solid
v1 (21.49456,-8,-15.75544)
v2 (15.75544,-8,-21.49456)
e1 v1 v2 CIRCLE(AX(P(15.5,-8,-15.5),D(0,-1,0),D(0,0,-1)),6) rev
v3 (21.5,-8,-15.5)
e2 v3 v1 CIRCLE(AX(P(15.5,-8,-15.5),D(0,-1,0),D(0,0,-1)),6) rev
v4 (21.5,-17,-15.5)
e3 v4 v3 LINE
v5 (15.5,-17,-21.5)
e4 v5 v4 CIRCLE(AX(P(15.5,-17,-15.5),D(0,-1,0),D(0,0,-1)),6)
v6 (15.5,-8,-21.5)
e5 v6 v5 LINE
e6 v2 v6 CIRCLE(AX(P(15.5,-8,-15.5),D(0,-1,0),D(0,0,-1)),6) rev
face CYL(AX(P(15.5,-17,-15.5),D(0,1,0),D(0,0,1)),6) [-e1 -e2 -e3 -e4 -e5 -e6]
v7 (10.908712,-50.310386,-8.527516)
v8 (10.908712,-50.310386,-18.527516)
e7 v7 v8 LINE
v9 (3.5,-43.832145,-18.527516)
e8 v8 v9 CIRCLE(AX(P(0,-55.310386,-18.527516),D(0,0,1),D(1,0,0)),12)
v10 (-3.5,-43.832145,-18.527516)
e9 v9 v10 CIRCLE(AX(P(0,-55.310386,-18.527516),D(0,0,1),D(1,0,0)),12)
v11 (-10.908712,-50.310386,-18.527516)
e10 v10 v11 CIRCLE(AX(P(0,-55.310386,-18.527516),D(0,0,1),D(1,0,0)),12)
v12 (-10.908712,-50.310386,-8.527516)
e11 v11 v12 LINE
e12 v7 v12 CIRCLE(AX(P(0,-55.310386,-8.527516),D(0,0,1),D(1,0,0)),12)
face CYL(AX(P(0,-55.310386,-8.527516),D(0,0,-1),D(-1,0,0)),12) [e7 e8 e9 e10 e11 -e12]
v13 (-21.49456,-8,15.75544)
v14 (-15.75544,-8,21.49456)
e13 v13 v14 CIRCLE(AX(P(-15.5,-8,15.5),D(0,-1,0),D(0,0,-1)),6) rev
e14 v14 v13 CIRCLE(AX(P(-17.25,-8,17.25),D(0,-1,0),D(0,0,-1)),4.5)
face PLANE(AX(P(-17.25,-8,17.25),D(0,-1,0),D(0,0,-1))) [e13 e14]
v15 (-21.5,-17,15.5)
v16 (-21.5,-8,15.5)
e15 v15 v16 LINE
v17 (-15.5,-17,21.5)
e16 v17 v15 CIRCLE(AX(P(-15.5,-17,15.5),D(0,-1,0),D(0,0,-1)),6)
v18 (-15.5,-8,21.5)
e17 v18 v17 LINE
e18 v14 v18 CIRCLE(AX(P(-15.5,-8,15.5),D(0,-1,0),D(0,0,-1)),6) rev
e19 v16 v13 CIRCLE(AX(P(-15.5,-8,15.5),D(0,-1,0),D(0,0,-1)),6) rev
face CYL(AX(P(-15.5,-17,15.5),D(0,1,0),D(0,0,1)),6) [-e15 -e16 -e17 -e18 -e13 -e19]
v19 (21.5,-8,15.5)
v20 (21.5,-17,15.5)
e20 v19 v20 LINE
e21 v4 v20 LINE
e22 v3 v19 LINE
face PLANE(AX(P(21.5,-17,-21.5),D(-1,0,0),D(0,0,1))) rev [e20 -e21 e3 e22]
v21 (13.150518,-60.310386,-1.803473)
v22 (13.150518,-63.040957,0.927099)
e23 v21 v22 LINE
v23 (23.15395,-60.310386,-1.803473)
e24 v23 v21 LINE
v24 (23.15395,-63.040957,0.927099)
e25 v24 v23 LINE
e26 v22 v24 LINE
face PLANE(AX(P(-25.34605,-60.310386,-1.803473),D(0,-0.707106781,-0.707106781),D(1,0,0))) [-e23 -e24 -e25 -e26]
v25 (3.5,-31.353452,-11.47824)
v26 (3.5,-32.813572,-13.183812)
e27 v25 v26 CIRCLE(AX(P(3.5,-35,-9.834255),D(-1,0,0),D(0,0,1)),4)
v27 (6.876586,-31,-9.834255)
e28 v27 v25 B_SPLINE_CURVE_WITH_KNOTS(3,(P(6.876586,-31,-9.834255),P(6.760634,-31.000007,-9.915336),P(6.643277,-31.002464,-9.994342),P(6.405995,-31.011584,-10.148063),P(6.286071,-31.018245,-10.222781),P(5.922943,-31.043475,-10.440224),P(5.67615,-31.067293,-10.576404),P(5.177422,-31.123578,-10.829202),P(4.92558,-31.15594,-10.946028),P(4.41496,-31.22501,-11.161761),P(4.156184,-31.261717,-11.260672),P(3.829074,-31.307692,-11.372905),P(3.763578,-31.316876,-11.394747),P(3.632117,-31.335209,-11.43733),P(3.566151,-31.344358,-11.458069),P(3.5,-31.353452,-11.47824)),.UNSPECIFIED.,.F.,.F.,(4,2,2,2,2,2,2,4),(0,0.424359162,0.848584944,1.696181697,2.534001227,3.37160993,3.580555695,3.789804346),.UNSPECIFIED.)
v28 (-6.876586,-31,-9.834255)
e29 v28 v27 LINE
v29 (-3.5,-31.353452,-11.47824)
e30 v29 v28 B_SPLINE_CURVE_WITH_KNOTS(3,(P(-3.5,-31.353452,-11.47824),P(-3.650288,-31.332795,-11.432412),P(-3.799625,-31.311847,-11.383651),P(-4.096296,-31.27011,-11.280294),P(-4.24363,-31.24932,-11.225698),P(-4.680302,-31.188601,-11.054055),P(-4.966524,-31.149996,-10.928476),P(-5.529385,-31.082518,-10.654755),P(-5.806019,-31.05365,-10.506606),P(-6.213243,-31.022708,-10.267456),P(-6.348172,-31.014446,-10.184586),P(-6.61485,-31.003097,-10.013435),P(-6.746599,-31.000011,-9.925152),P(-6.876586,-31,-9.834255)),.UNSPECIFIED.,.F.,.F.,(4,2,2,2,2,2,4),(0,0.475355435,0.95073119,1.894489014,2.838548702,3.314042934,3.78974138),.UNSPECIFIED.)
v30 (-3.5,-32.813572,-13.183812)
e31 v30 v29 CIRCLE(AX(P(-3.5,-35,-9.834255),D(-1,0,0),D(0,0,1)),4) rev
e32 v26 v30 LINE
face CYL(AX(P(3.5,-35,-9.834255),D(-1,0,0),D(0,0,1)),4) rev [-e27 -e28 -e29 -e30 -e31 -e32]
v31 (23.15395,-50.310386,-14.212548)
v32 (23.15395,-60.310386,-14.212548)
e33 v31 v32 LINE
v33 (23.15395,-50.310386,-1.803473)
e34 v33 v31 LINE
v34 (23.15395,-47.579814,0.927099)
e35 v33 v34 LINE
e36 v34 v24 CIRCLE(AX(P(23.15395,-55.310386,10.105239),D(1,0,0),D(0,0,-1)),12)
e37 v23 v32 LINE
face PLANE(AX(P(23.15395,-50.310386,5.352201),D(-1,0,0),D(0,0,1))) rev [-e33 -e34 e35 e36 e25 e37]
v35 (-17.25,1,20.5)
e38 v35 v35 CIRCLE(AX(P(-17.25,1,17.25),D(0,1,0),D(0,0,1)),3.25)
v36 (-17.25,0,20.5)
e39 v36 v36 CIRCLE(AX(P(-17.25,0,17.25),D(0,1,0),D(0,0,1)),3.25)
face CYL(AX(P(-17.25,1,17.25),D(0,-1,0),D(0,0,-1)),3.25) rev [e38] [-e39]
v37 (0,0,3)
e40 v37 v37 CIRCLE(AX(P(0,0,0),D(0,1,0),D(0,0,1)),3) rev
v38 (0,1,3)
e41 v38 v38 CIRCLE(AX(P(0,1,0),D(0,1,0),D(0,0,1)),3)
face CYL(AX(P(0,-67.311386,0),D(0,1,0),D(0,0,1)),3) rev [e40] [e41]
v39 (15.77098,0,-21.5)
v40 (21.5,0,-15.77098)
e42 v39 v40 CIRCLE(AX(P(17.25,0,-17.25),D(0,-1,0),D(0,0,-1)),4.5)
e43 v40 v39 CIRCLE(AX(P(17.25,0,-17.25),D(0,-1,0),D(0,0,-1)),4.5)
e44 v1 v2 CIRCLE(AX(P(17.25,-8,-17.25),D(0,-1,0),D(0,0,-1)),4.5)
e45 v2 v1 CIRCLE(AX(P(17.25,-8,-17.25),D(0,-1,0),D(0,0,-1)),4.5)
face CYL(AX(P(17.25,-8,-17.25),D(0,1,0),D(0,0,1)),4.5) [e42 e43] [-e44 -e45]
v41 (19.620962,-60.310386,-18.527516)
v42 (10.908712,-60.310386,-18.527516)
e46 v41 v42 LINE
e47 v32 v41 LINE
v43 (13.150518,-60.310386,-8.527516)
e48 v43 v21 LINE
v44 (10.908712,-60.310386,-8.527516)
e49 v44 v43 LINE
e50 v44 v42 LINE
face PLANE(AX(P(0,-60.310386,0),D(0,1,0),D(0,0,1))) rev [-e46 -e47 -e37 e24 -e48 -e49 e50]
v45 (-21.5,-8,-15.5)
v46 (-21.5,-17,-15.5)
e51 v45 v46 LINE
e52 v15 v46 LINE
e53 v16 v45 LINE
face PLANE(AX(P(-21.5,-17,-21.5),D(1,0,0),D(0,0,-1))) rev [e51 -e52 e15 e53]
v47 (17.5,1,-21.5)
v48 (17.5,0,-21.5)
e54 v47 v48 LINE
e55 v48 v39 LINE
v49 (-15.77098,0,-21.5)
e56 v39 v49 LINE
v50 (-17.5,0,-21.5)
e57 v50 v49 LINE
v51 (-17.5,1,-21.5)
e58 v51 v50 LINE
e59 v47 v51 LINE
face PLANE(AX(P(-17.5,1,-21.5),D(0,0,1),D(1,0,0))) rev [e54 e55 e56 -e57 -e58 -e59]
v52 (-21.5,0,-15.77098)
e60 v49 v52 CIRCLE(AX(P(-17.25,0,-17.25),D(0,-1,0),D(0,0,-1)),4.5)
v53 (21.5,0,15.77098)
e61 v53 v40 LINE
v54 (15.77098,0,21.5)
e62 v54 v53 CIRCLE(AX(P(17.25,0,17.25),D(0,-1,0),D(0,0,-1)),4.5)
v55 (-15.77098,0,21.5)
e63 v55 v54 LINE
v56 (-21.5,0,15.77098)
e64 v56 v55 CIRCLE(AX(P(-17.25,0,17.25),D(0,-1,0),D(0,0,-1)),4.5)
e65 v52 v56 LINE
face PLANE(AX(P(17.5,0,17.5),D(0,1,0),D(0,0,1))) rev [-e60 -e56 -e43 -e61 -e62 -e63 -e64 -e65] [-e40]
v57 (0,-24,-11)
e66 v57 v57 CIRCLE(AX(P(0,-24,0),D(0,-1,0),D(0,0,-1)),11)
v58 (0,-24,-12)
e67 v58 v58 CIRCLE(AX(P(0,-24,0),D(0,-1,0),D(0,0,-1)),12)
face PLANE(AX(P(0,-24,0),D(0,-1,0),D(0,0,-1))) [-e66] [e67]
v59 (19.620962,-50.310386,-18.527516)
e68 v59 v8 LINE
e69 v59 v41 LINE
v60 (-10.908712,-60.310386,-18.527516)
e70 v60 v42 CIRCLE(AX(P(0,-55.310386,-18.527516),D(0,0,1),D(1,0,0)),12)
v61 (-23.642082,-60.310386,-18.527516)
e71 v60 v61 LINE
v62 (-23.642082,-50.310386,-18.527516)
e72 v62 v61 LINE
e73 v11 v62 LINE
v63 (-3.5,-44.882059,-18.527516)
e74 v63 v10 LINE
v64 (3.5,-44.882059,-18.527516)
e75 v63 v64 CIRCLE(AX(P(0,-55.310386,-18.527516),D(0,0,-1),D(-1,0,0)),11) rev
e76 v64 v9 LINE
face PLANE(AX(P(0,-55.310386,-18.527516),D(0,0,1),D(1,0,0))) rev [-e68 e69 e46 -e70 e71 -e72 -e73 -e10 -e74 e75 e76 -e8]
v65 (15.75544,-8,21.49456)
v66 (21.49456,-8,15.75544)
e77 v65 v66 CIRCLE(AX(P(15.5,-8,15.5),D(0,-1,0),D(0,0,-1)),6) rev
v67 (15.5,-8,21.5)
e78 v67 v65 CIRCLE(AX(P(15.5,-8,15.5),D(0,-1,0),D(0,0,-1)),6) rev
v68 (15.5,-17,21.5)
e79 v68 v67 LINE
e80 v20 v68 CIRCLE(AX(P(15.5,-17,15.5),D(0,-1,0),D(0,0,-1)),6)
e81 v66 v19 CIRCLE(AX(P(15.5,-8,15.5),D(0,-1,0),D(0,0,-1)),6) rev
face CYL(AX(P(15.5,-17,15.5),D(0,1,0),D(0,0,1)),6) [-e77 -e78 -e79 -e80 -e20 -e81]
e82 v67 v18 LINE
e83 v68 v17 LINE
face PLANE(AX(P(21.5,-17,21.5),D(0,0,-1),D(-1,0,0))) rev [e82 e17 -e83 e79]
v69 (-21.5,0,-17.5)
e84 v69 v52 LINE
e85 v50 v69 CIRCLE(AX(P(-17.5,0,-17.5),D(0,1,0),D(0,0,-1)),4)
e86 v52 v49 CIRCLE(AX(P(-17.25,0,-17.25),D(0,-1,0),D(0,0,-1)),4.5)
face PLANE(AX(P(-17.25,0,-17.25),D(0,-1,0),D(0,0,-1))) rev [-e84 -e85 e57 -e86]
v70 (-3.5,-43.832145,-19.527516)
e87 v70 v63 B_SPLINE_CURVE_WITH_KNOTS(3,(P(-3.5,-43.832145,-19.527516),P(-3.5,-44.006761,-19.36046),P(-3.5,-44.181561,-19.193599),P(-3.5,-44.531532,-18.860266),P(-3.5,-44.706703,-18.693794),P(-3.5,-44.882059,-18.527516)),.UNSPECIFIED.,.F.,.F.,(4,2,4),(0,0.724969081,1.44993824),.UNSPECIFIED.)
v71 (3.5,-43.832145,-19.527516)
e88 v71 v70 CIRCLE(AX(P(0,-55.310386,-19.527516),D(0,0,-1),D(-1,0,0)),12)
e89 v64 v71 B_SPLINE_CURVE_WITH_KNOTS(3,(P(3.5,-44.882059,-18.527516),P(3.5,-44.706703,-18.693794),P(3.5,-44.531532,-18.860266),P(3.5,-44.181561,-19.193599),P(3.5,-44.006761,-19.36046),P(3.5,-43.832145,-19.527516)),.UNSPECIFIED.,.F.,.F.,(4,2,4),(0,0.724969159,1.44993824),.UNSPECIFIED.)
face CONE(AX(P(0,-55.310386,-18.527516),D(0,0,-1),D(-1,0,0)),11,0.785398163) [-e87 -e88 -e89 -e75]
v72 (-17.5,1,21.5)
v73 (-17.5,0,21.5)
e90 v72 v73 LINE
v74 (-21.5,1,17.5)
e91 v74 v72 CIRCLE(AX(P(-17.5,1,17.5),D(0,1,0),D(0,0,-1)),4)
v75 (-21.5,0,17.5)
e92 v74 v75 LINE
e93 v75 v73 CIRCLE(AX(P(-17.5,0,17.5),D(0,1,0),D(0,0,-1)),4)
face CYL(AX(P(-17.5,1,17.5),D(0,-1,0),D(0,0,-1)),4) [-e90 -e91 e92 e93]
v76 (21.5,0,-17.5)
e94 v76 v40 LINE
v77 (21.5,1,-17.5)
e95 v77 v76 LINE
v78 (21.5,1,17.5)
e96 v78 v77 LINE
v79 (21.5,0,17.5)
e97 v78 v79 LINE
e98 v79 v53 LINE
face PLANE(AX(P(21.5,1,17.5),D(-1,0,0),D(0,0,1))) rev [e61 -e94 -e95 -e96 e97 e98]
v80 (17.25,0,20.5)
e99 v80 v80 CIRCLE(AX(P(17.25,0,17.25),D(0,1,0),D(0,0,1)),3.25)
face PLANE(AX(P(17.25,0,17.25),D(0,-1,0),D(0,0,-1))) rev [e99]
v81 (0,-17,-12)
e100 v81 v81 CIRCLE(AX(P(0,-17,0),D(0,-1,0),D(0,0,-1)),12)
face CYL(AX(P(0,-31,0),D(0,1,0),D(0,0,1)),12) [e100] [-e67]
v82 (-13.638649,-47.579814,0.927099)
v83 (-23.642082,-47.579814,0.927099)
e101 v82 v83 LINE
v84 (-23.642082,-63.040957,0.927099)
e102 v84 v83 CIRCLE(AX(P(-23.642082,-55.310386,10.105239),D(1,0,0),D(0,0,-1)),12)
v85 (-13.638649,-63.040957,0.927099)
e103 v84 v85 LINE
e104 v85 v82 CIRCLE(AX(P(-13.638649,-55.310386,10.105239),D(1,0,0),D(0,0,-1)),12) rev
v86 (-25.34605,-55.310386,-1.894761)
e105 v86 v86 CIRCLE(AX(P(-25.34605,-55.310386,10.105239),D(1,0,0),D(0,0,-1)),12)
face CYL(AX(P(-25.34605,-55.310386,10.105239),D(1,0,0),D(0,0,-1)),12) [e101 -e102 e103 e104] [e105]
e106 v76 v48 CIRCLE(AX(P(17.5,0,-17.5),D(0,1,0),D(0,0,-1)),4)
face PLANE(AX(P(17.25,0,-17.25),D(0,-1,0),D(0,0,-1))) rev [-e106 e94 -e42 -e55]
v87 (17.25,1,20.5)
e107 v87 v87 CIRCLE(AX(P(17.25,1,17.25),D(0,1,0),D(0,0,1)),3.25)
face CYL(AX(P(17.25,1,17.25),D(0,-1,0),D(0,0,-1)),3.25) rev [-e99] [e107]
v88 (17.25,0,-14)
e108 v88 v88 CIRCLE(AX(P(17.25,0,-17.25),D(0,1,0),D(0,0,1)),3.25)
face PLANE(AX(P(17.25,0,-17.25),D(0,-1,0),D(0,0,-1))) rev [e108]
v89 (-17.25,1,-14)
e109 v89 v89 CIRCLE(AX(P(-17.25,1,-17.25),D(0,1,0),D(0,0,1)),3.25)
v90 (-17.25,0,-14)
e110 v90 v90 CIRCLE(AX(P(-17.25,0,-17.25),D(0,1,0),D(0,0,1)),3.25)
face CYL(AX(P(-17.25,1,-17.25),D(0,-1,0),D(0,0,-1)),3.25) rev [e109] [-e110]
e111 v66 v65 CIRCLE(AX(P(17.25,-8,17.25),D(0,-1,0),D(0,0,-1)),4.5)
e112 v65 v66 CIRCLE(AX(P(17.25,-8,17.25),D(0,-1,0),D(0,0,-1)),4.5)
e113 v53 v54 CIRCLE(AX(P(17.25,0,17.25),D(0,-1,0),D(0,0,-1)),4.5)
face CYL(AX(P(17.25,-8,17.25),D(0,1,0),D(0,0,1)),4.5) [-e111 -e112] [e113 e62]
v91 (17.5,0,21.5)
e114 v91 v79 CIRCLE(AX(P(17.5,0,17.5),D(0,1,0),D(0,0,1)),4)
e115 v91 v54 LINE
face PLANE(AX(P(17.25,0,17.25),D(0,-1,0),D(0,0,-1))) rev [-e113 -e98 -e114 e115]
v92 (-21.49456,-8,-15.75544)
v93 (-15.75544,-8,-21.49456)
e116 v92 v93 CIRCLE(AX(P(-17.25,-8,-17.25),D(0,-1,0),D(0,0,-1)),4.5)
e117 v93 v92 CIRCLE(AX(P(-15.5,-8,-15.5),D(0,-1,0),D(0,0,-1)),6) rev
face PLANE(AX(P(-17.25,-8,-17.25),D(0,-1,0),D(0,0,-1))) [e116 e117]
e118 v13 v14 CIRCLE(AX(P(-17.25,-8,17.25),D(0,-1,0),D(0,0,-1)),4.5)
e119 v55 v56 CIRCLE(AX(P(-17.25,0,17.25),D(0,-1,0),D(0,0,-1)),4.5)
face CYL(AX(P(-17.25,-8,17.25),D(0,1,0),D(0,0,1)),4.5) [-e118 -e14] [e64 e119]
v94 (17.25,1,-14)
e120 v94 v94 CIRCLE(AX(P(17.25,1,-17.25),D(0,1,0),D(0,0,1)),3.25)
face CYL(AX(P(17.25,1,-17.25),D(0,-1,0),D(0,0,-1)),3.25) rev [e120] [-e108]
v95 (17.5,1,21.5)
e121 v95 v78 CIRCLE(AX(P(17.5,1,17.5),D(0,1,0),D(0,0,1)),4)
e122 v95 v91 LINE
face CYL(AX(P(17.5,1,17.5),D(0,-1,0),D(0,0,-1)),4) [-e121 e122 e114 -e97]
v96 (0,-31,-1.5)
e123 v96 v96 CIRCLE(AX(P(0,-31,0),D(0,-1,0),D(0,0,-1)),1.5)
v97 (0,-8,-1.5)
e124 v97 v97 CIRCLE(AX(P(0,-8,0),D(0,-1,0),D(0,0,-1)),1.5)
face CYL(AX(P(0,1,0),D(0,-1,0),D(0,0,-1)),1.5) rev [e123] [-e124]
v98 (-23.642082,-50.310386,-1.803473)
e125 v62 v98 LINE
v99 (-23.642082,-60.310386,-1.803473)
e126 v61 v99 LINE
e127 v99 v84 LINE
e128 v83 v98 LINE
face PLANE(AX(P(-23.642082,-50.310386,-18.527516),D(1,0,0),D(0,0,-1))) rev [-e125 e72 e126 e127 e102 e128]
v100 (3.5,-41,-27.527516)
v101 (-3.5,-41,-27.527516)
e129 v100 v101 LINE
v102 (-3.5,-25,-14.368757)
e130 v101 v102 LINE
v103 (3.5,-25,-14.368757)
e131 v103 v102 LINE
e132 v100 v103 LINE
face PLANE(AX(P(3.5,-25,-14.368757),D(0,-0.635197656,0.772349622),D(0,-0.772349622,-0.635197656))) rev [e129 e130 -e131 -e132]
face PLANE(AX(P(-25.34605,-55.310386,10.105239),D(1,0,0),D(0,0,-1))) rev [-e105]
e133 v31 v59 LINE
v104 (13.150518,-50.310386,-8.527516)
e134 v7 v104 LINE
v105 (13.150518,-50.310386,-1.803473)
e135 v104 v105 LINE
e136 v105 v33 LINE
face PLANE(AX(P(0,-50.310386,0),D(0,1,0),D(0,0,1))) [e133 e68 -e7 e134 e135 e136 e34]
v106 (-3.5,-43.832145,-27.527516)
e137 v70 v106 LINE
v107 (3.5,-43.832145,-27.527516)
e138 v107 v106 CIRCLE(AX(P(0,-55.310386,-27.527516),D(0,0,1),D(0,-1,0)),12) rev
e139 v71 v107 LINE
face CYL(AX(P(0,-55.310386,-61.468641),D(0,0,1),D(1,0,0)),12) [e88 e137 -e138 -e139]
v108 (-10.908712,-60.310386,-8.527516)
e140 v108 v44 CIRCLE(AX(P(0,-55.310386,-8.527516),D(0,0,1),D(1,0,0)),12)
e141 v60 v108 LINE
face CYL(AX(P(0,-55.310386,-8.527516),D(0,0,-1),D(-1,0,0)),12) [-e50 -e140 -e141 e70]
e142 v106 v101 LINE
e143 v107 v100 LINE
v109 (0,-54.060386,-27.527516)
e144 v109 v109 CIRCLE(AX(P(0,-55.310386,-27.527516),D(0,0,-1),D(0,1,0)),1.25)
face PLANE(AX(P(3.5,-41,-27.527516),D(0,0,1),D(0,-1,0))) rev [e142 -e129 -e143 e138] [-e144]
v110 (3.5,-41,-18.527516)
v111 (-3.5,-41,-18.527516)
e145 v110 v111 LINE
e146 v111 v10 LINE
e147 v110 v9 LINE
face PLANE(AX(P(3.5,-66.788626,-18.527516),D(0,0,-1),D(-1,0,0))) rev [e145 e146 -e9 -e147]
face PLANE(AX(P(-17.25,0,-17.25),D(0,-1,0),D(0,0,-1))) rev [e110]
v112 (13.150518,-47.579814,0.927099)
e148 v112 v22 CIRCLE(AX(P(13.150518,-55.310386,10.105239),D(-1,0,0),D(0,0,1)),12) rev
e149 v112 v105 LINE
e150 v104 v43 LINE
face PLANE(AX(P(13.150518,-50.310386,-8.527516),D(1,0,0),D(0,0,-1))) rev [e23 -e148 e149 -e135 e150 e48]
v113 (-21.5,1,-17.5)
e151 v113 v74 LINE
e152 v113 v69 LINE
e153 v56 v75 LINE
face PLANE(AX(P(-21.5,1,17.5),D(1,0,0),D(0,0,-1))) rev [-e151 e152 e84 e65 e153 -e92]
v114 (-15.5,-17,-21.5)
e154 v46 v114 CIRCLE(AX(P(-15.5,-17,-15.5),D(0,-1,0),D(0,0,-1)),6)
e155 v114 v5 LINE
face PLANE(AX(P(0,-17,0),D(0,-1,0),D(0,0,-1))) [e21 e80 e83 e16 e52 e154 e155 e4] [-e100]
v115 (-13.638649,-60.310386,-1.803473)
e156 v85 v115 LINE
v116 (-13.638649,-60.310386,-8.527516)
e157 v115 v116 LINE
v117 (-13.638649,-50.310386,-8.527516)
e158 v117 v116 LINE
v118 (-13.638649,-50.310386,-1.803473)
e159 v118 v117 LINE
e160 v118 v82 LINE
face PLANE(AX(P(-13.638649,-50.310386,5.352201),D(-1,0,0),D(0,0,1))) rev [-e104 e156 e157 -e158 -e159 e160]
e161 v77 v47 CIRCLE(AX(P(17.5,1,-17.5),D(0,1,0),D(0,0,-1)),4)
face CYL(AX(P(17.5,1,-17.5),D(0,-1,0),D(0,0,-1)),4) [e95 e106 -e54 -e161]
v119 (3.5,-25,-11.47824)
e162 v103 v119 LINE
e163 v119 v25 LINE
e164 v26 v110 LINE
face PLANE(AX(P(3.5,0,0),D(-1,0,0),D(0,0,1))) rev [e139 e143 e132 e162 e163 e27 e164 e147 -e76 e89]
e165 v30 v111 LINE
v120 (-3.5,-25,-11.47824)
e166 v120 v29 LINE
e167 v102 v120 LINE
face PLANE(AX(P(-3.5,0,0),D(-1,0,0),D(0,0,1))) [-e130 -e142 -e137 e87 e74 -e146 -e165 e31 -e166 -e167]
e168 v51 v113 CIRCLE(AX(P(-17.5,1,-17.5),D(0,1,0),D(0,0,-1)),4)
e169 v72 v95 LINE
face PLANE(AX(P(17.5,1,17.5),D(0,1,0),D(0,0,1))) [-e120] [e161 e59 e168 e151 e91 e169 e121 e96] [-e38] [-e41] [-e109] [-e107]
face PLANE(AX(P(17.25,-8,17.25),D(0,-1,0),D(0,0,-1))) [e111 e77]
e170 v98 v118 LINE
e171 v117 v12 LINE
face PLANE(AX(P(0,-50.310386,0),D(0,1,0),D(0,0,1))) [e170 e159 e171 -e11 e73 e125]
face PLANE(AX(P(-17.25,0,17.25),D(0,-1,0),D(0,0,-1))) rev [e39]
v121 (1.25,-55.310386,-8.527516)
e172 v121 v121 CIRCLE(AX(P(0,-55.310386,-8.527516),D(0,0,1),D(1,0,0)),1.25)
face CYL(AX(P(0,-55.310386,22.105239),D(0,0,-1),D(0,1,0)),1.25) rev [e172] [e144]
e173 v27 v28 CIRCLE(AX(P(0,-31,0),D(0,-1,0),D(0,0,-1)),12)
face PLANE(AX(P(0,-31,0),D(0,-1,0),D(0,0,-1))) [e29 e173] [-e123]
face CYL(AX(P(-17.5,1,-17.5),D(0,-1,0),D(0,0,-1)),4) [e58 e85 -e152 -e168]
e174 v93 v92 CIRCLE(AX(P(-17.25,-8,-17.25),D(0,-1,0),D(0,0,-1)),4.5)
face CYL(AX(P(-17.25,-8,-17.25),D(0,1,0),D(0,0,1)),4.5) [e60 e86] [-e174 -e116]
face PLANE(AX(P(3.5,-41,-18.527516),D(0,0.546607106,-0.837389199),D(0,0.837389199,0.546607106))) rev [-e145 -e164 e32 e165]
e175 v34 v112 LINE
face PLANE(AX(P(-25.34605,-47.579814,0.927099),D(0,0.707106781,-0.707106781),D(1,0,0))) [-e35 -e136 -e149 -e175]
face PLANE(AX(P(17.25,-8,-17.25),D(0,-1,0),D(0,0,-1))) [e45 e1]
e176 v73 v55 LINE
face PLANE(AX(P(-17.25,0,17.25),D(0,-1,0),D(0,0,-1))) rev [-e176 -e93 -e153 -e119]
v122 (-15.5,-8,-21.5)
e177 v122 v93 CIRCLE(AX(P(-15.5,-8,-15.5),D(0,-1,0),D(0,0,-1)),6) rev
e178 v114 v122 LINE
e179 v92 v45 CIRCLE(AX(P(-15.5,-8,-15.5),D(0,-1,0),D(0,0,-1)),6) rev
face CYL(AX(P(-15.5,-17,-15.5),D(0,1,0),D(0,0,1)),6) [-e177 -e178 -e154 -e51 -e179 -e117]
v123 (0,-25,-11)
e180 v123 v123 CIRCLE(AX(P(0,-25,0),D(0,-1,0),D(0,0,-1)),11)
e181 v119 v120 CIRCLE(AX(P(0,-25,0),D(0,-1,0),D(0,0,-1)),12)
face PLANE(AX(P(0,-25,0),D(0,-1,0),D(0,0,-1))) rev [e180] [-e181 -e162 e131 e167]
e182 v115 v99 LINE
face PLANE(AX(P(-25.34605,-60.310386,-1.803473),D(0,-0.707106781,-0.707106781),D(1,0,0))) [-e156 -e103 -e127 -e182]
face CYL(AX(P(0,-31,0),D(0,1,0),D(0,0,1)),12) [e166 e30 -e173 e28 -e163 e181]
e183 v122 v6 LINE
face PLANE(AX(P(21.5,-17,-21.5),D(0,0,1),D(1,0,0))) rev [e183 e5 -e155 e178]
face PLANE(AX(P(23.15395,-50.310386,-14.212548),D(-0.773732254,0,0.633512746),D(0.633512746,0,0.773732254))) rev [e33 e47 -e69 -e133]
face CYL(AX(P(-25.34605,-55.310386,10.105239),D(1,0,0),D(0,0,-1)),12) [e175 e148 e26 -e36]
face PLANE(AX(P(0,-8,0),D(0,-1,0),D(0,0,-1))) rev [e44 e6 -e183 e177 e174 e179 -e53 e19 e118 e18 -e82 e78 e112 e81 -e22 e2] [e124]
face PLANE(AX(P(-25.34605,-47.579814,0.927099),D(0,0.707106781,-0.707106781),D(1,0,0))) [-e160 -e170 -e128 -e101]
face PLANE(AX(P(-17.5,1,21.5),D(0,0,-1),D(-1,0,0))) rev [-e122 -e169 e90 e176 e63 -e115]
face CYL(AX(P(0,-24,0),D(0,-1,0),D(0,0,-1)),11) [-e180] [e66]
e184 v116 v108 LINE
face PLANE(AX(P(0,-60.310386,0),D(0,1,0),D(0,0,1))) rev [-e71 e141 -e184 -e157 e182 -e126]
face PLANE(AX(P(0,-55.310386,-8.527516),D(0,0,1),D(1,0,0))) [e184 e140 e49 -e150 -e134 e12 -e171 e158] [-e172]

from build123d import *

# Parameters (mm, degrees)
SKETCH1_R               = 3.25
BOSS_EXTRUDE1_DEPTH     = 1
SKETCH3_R               = 4.5
BOSS_EXTRUDE2_DEPTH     = 8
SKETCH4_W               = 43
SKETCH4_H               = 43
BOSS_EXTRUDE3_DEPTH     = 9
FILLET1_R               = 6
SKETCH5_R               = 12
BOSS_EXTRUDE4_DEPTH     = 14
CUT_EXTRUDE1_START      = 7
SKETCH6_R               = 12
SKETCH6_R_2             = 11
CUT_EXTRUDE1_DEPTH      = 1
BOSS_EXTRUDE5_DEPTH     = 3.5
FILLET2_R               = 4
SKETCH8_R               = 12
BOSS_EXTRUDE6_DEPTH     = 9
CHAMFER1_SIZE           = 1
BOSS_EXTRUDE7_START     = 10
SKETCH10_R              = 12
BOSS_EXTRUDE7_DEPTH     = 10
BOSS_EXTRUDE8_DEPTH     = 5
SKETCH12_R              = 12
BOSS_EXTRUDE9_DEPTH     = 48.5
CUT_EXTRUDE2_DEPTH      = 72.827221304
CUT_EXTRUDE2_DEPTH_BACK = 20
SKETCH13_W              = 26.789167307
SKETCH13_H              = 48.357994596
CHAMFER2_SIZE           = 1
CHAMFER4_SIZE           = 1
CHAMFER5_SIZE           = 1
SKETCH17_R              = 1.25
CUT_EXTRUDE4_DEPTH      = 88.387187875
CUT_EXTRUDE5_REACH      = 79.888
SKETCH18_R              = 3
SKETCH19_R              = 1.5
CUT_EXTRUDE6_DEPTH      = 53.140487552


with BuildPart() as part:
    # Sketch1 → Boss-Extrude1 (new body)
    with BuildSketch(Plane(origin=(0, 0, 0), x_dir=(1, 0, 0), z_dir=(0, 1, 0))):
        with BuildLine():
            Line((-17.5, -21.5), (17.5, -21.5))
            ThreePointArc((17.5, -21.5), (20.328427125, -20.328427125), (21.5, -17.5))
            Line((21.5, -17.5), (21.5, 17.5))
            ThreePointArc((21.5, 17.5), (20.328427125, 20.328427125), (17.5, 21.5))
            Line((17.5, 21.5), (-17.5, 21.5))
            ThreePointArc((-17.5, 21.5), (-20.328427125, 20.328427125), (-21.5, 17.5))
            Line((-21.5, 17.5), (-21.5, -17.5))
            ThreePointArc((-21.5, -17.5), (-20.328427125, -20.328427125), (-17.5, -21.5))
        make_face()
        with Locations(Location((-17.25, 17.25, 0), (0, 0, 270))):
            Circle(SKETCH1_R, mode=Mode.SUBTRACT)
        with Locations(Location((17.25, 17.25, 0), (0, 0, 270))):
            Circle(SKETCH1_R, mode=Mode.SUBTRACT)
        with Locations(Location((17.25, -17.25, 0), (0, 0, 270))):
            Circle(SKETCH1_R, mode=Mode.SUBTRACT)
        with Locations(Location((-17.25, -17.25, 0), (0, 0, 270))):
            Circle(SKETCH1_R, mode=Mode.SUBTRACT)
    extrude(amount=BOSS_EXTRUDE1_DEPTH)

    # Sketch3 → Boss-Extrude2 (add)
    with BuildSketch(Plane.XZ):
        with Locations(Location((-17.25, 17.25, 0), (0, 0, 70.811863546))):
            Circle(SKETCH3_R)
        with Locations(Location((17.25, 17.25, 0), (0, 0, 109.188136454))):
            Circle(SKETCH3_R)
        with Locations(Location((17.25, -17.25, 0), (0, 0, 19.188136454))):
            Circle(SKETCH3_R)
        with Locations(Location((-17.25, -17.25, 0), (0, 0, 160.811863546))):
            Circle(SKETCH3_R)
    extrude(amount=BOSS_EXTRUDE2_DEPTH)

    # Sketch4 → Boss-Extrude3 (add)
    with BuildSketch(Plane.XZ.offset(8)):
        Rectangle(SKETCH4_W, SKETCH4_H)
    extrude(amount=BOSS_EXTRUDE3_DEPTH)

    # Fillet1
    # the kernel refuses this fillet: 6 mm, written as the material it takes off along each edge
    with BuildSketch(Plane(origin=(-21.5, -8, 21.5), x_dir=(1, 0, 0), z_dir=(0, -1, 0)), Plane(origin=(-21.5, -8, -21.5), x_dir=(0, 0, 1), z_dir=(0, -1, 0)), Plane(origin=(21.5, -8, 21.5), x_dir=(0, 0, -1), z_dir=(0, -1, 0))) as fillet1_piece_1:
        with BuildLine():
            CenterArc((FILLET1_R, -FILLET1_R), FILLET1_R, 90, 90)
            Line((0, -FILLET1_R), (0, 0))
            Line((0, 0), (FILLET1_R, 0))
        make_face()
    extrude(amount=24, mode=Mode.SUBTRACT)
    with BuildSketch(Plane(origin=(21.5, -8, -21.5), x_dir=(0, 0, 1), z_dir=(0, -1, 0))) as fillet1_piece_2:
        with BuildLine():
            CenterArc((FILLET1_R, FILLET1_R), FILLET1_R, 180, 90)
            Line((0, FILLET1_R), (0, 0))
            Line((0, 0), (FILLET1_R, 0))
        make_face()
    extrude(amount=24, mode=Mode.SUBTRACT)

    # Sketch5 → Boss-Extrude4 (add)
    with BuildSketch(Plane.XZ.offset(17)):
        with Locations(Location((0, 0, 0), (0, 0, 270))):
            Circle(SKETCH5_R)
    extrude(amount=BOSS_EXTRUDE4_DEPTH)

    # Sketch6 → Cut-Extrude1 (cut)
    with BuildSketch(Plane.XZ.offset(17).offset(CUT_EXTRUDE1_START)):
        with Locations(Location((0, 0, 0), (0, 0, 270))):
            Circle(SKETCH6_R)
        with Locations(Location((0, 0, 0), (0, 0, 270))):
            Circle(SKETCH6_R_2, mode=Mode.SUBTRACT)
    extrude(amount=CUT_EXTRUDE1_DEPTH, mode=Mode.SUBTRACT)

    # Sketch7 → Boss-Extrude5 (add, symmetric)
    with BuildSketch(Plane(origin=(0, 0, 0), x_dir=(0, 0, -1), z_dir=(1, 0, 0))):
        Polygon((0, -25), (14.368756657, -25), (27.527515604, -41), (27.527515604, -66.788625846), (18.527515604, -66.788625846), (18.527515604, -41), (12, -31), (0, -31), align=None)
    extrude(amount=BOSS_EXTRUDE5_DEPTH, both=True)

    # Fillet2
    fillet2_edges = [part.edges().sort_by_distance(p)[0] for p in [
        (0, -31, -12),
    ]]
    fillet(fillet2_edges, radius=FILLET2_R)

    # Sketch8 → Boss-Extrude6 (add)
    with BuildSketch(Plane.XY.offset(-18.527515604)):
        with Locations((0, -55.310385562)):
            Circle(SKETCH8_R)
    extrude(amount=-BOSS_EXTRUDE6_DEPTH)

    # Chamfer1
    chamfer1_edges = [part.edges().sort_by_distance(p)[0] for p in [
        (0, -67.310385562, -18.527515604),
    ]]
    chamfer(chamfer1_edges, length=CHAMFER1_SIZE)

    # Sketch10 → Boss-Extrude7 (add)
    with BuildSketch(Plane.XY.offset(-18.527515604).offset(BOSS_EXTRUDE7_START)):
        with Locations(Location((0, -55.310385562, 0), (0, 0, 106.9577633))):
            Circle(SKETCH10_R)
    extrude(amount=-BOSS_EXTRUDE7_DEPTH)

    # Sketch11 → Boss-Extrude8 (add, symmetric)
    with BuildSketch(Plane(origin=(0, -55.310385562, 0), x_dir=(1, 0, 0), z_dir=(0, 1, 0))):
        Polygon((-13.638649199, -5.352201133), (-13.638649199, 8.527515604), (13.150518108, 8.527515604), (13.150518108, -5.352201133), (23.153950462, -5.352201133), (23.153950462, 14.212548323), (19.620962458, 18.527515604), (-23.642081553, 18.527515604), (-23.642081553, -5.352201133), align=None)
    extrude(amount=BOSS_EXTRUDE8_DEPTH, both=True)

    # Sketch12 → Boss-Extrude9 (add)
    with BuildSketch(Plane(origin=(23.153950462, 0, 0), x_dir=(0, 0, -1), z_dir=(1, 0, 0))):
        with Locations((-10.105239438, -55.310385562)):
            Circle(SKETCH12_R)
    extrude(amount=-BOSS_EXTRUDE9_DEPTH)

    # Sketch13 → Cut-Extrude2 (cut, two sides: drawn at the far end of the back side and taken through both)
    with BuildSketch(Plane.XZ.offset(60.310385562).offset(-CUT_EXTRUDE2_DEPTH_BACK)):
        with Locations((-0.244065546, 15.651481694)):
            Rectangle(SKETCH13_W, SKETCH13_H)
    extrude(amount=CUT_EXTRUDE2_DEPTH + CUT_EXTRUDE2_DEPTH_BACK, mode=Mode.SUBTRACT)

    # Chamfer2
    # the kernel refuses this chamfer: 2.030899419, 1 mm, written as the material it adds along each edge
    with BuildSketch(Plane(origin=(13.150518108, -50.310385562, -0.803472677), x_dir=(0, 0, -1), z_dir=(1, 0, 0)), Plane(origin=(-23.642081553, -50.310385562, -0.803472677), x_dir=(0, 0, -1), z_dir=(1, 0, 0))) as chamfer2_piece_1:
        with BuildLine():
            Line((CHAMFER2_SIZE, 0), (-1.730571797, 2.730571797))
            ThreePointArc((-1.730571797, 2.730571797), (-0.794397889, 1.45760387), (0, 0))
            Line((0, 0), (CHAMFER2_SIZE, 0))
        make_face()
    extrude(amount=10.003432354)

    # Chamfer4
    # the kernel refuses this chamfer: 2.030899419, 1 mm, written as the material it adds along each edge
    with BuildSketch(Plane(origin=(13.150518108, -60.310385562, -0.803472677), x_dir=(0, 0, -1), z_dir=(1, 0, 0))) as chamfer4_piece_1:
        with BuildLine():
            Line((CHAMFER4_SIZE, 0), (-1.730571797, -2.730571797))
            ThreePointArc((-1.730571797, -2.730571797), (-0.794397889, -1.45760387), (0, 0))
            Line((0, 0), (CHAMFER4_SIZE, 0))
        make_face()
    extrude(amount=10.003432354)

    # Chamfer5
    # the kernel refuses this chamfer: 2.030899419, 1 mm, written as the material it adds along each edge
    with BuildSketch(Plane(origin=(-23.642081553, -60.310385562, -0.803472677), x_dir=(0, 0, -1), z_dir=(1, 0, 0))) as chamfer5_piece_1:
        with BuildLine():
            Line((CHAMFER5_SIZE, 0), (-1.730571797, -2.730571797))
            ThreePointArc((-1.730571797, -2.730571797), (-0.794397889, -1.45760387), (0, 0))
            Line((0, 0), (CHAMFER5_SIZE, 0))
        make_face()
    extrude(amount=10.003432354)

    # Sketch17 → Cut-Extrude4 (cut, through all)
    with BuildSketch(Plane(origin=(0, 0, -27.527515604), x_dir=(-1, 0, 0), z_dir=(0, 0, -1))):
        with Locations(Location((0, -55.310385562, 0), (0, 0, 90))):
            Circle(SKETCH17_R)
    extrude(amount=-CUT_EXTRUDE4_DEPTH, mode=Mode.SUBTRACT)

    # Sketch18 → Cut-Extrude5 (cut, up to next)
    with BuildSketch(Plane(origin=(0, 1, 0), x_dir=(1, 0, 0), z_dir=(0, 1, 0)), mode=Mode.PRIVATE) as cut_extrude5_sk1:
        with Locations(Location((0, 0, 0), (0, 0, 270))):
            Circle(SKETCH18_R)
    cut_extrude5_tool1 = extrude(cut_extrude5_sk1.sketch, amount=-CUT_EXTRUDE5_REACH, mode=Mode.PRIVATE) & part.part
    add(cut_extrude5_tool1.solids().sort_by_distance((0, 1, 0))[0], mode=Mode.SUBTRACT)

    # Sketch19 → Cut-Extrude6 (cut, through all)
    with BuildSketch(Plane.XZ.offset(31)):
        with Locations(Location((0, 0, 0), (0, 0, 270))):
            Circle(SKETCH19_R)
    extrude(amount=-CUT_EXTRUDE6_DEPTH, mode=Mode.SUBTRACT)


solid = part.part
